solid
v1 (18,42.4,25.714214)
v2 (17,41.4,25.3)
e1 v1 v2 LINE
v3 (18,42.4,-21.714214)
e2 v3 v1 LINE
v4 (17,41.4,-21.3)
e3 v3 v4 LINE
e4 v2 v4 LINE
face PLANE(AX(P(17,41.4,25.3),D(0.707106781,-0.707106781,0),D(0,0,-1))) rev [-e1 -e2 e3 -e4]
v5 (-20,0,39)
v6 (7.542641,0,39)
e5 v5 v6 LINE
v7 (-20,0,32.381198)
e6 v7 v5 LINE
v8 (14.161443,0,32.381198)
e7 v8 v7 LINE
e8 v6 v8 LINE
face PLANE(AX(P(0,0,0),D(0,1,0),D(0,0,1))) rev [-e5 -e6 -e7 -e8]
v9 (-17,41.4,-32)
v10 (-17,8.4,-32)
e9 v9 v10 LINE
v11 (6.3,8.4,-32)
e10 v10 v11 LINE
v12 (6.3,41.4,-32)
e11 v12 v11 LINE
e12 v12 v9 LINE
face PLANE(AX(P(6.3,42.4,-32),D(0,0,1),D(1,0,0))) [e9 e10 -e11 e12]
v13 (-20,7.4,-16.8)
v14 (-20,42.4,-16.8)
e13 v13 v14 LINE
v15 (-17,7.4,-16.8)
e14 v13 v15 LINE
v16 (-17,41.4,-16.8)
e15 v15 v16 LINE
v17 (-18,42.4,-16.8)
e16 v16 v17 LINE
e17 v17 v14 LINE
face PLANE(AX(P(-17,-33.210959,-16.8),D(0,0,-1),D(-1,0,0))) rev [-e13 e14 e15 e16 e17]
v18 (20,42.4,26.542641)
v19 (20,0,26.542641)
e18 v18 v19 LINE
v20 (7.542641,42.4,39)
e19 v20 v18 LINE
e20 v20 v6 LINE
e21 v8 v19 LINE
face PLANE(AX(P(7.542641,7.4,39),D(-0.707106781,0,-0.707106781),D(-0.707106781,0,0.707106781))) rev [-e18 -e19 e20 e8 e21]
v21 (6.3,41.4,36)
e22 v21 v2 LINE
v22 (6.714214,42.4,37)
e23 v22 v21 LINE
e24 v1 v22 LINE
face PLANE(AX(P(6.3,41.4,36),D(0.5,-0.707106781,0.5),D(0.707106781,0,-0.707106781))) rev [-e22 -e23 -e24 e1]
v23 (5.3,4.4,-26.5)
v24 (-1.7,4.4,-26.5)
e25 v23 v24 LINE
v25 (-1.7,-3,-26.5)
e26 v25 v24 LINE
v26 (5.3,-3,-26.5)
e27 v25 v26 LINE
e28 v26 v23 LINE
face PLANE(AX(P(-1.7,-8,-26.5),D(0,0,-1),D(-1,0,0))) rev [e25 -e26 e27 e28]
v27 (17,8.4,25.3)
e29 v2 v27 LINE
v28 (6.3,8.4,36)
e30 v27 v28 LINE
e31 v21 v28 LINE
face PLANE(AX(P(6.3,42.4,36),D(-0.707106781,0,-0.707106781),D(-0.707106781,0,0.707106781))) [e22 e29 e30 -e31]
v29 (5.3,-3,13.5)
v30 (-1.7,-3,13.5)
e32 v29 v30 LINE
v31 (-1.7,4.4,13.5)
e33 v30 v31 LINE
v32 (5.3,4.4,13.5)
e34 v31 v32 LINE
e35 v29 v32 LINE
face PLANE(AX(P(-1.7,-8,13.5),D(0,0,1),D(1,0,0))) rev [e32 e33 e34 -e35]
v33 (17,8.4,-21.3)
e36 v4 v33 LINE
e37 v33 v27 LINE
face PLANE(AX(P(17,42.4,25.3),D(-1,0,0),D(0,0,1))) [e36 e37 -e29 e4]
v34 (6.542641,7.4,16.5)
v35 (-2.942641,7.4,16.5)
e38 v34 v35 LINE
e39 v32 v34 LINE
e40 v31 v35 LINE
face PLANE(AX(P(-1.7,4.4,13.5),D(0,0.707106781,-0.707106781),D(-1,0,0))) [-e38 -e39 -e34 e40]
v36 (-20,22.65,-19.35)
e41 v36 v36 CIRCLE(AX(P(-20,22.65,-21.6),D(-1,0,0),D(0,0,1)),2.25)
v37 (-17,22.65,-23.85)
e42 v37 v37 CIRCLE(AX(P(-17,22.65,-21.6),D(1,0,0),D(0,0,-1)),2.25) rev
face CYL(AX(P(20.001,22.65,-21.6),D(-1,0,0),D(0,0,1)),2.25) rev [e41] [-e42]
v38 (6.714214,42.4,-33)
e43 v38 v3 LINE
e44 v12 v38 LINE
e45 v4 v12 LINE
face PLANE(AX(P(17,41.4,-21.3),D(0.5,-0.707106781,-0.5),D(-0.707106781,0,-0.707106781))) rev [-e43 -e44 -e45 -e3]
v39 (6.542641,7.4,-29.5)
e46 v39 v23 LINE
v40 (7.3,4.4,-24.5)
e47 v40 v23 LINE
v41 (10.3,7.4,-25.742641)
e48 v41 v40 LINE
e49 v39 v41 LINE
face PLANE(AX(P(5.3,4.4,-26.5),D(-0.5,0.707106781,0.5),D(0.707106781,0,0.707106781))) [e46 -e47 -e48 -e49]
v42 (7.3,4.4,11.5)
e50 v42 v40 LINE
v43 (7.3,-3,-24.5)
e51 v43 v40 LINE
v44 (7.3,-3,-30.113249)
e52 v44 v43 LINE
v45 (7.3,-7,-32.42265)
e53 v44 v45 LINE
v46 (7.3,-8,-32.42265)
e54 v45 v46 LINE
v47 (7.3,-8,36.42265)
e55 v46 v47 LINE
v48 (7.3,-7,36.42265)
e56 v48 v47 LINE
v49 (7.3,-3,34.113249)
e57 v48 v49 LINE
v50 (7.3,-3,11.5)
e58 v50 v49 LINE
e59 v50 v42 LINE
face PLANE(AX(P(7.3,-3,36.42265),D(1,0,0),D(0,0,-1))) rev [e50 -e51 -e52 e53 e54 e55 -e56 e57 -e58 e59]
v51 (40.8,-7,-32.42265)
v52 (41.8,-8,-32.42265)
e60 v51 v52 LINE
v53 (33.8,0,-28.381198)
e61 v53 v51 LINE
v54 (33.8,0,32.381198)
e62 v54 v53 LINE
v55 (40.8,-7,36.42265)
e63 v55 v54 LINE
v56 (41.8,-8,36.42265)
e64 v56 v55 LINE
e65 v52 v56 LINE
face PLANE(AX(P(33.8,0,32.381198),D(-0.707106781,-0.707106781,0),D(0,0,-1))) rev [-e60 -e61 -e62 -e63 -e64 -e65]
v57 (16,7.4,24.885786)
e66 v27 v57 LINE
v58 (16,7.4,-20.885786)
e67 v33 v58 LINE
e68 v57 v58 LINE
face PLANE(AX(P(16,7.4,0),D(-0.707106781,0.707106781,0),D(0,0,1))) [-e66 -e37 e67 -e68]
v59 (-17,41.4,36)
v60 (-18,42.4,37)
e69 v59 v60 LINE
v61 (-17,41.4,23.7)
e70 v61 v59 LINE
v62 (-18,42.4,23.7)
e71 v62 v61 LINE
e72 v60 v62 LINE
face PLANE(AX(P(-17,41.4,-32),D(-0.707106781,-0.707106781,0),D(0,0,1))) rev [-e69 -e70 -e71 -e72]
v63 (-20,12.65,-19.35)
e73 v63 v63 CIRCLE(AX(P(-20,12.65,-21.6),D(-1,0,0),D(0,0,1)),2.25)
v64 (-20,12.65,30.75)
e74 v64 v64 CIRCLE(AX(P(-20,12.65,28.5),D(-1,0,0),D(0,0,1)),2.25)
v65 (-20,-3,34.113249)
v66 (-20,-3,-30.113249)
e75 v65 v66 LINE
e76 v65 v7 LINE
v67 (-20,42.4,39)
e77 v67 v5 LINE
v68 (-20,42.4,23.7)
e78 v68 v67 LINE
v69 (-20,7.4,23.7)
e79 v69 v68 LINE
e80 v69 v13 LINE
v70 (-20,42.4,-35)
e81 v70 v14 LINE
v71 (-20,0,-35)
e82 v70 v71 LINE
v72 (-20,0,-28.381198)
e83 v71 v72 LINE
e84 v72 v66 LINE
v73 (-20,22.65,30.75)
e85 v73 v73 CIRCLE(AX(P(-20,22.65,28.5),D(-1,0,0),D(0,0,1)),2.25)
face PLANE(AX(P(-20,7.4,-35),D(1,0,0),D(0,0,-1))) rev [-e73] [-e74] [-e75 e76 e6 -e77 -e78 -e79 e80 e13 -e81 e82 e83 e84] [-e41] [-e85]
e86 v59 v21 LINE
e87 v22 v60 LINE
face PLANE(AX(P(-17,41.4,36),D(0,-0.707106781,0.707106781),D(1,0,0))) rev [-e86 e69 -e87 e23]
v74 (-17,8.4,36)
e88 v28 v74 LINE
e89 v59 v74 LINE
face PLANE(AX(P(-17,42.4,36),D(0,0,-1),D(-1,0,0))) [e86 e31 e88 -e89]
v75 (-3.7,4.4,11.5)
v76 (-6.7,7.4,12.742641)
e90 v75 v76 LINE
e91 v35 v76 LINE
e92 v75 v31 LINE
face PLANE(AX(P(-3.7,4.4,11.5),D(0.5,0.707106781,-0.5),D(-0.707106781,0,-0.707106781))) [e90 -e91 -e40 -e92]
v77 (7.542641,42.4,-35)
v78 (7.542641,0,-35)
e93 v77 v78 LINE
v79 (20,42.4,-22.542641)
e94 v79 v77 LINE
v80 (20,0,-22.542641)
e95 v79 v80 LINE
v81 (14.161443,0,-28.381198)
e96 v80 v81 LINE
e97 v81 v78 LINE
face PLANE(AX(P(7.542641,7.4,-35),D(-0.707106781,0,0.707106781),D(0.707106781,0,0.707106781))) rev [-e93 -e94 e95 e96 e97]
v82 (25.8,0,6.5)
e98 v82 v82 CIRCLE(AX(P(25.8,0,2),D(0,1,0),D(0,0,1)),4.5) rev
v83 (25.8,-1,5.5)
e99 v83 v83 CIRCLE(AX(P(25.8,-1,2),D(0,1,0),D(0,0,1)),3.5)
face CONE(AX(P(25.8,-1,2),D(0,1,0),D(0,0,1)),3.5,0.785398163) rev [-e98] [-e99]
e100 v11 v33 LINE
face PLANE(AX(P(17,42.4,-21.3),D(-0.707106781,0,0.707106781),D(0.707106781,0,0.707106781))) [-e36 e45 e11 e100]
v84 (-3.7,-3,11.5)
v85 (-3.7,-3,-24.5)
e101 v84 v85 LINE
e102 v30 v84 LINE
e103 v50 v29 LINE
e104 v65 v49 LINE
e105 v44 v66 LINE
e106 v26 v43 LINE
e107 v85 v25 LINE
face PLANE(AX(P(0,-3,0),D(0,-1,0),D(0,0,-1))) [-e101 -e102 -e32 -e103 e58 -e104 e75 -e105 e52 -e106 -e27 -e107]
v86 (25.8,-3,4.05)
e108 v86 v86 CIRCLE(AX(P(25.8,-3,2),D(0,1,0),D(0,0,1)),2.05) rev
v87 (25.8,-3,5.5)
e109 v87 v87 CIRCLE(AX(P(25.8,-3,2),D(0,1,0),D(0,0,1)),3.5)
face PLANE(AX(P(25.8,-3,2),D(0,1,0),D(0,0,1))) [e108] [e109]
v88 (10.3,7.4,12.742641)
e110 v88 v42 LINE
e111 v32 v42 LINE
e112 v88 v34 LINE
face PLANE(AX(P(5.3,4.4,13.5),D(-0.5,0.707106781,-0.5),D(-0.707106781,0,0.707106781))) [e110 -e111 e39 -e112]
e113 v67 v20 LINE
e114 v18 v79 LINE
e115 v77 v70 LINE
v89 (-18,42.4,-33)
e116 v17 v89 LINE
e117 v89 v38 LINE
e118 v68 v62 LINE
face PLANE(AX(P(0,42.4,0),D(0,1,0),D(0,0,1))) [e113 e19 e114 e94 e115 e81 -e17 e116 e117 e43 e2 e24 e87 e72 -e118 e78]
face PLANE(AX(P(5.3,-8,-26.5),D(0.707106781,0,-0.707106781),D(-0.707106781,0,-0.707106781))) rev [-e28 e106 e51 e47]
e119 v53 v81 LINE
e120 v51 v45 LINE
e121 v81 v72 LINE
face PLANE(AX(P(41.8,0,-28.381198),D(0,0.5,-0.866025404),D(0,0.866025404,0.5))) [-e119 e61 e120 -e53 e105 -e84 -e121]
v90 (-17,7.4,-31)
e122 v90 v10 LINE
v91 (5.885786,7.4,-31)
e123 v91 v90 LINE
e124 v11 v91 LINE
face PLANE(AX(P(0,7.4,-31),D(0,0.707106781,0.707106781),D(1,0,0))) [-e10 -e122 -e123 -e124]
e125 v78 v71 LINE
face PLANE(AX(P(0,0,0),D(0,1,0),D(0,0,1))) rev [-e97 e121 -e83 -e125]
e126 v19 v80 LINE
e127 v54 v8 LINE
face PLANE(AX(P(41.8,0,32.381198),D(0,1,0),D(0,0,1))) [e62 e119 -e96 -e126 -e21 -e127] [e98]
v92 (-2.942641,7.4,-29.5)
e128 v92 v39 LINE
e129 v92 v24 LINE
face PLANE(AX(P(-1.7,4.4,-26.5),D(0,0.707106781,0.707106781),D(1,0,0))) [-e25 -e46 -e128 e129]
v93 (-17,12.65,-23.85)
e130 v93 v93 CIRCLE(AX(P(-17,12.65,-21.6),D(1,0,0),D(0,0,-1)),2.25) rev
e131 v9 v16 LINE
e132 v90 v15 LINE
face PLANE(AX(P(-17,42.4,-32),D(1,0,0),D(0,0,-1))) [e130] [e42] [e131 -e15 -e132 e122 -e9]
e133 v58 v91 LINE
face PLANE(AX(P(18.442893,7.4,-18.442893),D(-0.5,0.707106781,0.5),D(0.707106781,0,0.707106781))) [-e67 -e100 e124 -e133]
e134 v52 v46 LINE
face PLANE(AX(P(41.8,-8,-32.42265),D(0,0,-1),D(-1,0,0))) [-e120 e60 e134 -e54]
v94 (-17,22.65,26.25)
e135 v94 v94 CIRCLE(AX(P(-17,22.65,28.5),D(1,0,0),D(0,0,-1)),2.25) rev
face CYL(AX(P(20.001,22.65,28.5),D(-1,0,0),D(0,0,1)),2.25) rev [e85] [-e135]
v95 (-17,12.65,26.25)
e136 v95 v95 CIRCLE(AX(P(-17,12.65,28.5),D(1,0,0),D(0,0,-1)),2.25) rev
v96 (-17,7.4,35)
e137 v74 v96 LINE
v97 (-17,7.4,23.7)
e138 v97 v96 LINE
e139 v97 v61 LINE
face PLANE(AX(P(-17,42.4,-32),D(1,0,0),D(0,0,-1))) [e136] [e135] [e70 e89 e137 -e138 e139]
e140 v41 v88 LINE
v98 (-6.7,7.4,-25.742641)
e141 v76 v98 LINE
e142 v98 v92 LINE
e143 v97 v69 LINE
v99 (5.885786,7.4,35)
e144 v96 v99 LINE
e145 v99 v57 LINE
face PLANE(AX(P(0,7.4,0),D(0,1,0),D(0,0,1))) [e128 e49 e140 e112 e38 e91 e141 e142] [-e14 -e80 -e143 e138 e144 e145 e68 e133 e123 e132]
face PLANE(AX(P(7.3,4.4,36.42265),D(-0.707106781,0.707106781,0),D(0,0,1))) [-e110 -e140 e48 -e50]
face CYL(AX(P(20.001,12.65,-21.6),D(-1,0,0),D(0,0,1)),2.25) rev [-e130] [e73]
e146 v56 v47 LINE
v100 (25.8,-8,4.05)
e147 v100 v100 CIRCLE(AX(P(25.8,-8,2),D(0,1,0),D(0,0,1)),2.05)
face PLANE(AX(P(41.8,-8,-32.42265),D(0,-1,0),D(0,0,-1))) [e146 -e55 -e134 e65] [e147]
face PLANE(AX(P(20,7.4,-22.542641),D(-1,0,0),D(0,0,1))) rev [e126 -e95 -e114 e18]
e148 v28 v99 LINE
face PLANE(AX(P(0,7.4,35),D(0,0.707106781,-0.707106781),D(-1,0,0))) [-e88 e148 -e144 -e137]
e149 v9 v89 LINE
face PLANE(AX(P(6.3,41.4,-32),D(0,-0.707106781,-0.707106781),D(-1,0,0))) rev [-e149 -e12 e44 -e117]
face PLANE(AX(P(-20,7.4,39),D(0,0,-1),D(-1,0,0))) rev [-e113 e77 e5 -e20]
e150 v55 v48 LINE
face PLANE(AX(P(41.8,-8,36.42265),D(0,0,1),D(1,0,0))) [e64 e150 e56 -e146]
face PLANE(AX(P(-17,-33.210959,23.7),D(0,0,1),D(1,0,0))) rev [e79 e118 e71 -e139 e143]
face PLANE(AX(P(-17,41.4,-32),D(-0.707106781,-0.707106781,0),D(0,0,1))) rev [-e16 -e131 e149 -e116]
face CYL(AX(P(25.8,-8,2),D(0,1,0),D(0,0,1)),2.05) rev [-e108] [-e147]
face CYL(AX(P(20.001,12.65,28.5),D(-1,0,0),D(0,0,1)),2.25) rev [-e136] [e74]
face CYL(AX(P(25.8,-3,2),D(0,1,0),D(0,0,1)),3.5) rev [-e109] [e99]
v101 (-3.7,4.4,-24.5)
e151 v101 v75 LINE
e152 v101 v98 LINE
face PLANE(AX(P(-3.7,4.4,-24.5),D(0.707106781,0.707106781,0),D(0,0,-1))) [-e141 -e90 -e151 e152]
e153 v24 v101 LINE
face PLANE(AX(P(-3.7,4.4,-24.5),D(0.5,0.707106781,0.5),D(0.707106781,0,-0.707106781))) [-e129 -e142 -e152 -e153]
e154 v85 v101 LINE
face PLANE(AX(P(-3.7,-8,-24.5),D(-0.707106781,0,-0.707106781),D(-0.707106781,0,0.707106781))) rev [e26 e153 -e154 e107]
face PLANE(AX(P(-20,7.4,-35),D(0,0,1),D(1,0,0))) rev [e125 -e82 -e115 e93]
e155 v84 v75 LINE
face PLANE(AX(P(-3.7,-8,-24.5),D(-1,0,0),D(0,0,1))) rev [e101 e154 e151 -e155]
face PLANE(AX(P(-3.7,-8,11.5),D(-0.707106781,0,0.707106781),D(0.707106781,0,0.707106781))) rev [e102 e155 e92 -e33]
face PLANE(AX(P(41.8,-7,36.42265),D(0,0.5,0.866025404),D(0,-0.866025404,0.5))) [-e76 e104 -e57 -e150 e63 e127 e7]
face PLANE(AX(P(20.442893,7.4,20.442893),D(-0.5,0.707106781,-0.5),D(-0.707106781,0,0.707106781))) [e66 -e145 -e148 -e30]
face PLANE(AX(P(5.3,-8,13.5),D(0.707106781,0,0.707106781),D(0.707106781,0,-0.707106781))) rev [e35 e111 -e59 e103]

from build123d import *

# Parameters (mm, degrees)
MAIN_FACE_EXTRUDE_DEPTH              = 7.4
MAIN_WALLS_EXTRUDE_DEPTH             = 35
MAIN_WALLS_LOWER_CHAMFER_SIZE        = 1
MAIN_WALLS_ENTRY_CHAMFER_SIZE        = 1
SKETCH4_W                            = 3
SKETCH4_H                            = 40.5
SERVO_MOUNT_CUT_DEPTH                = 35
SERVO_MOUNT_HOLES_REACH              = 72.134
SKETCH5_R                            = 2.25
MOUNT_DOVETAIL_DEPTH                 = 61.8
MOUNT_DOVETAIL_CHAMFER_SIZE          = 8
SKETCH9_W                            = 27.3
SKETCH9_H                            = 68.845299462
DOVETAIL_OFFSET_CUT_DEPTH            = 5
SKETCH10_R                           = 2.05
MOUNT_SCREW_HOLE_DEPTH               = 72.175838597
SKETCH11_R                           = 3.5
MOUNT_SCREW_COUNTERSINK_DEPTH        = 3
MOUNT_SCREW_COUNTERSINK_CHAMFER_SIZE = 1
GEAR_CUT_DEPTH                       = 68.031634323
GEAR_ENTRY_CHAMFER_SIZE              = 3


with BuildPart() as part:
    # Sketch1 → Main Face Extrude (new body)
    with BuildSketch(Plane(origin=(0, 0, 0), x_dir=(1, 0, 0), z_dir=(0, 1, 0))):
        Polygon((-20, 35), (7.542640687, 35), (20, 22.542640687), (20, -26.542640687), (7.542640687, -39), (-20, -39), align=None)
    extrude(amount=MAIN_FACE_EXTRUDE_DEPTH)

    # Sketch3 → Main Walls Extrude (add)
    with BuildSketch(Plane(origin=(0, 7.4, 0), x_dir=(1, 0, 0), z_dir=(0, 1, 0))):
        Polygon((-20, 35), (-20, -39), (7.542640687, -39), (20, -26.542640687), (20, 22.542640687), (7.542640687, 35), align=None)
        Polygon((-17, 32), (-17, -36), (6.3, -36), (17, -25.3), (17, 21.3), (6.3, 32), align=None, mode=Mode.SUBTRACT)
    extrude(amount=MAIN_WALLS_EXTRUDE_DEPTH)

    # Main Walls Lower Chamfer
    main_walls_lower_chamfer_edges = [part.edges().sort_by_distance(p)[0] for p in [
        (-5.35, 7.4, -32),
        (-5.35, 7.4, 36),
        (11.65, 7.4, 30.65),
        (17, 7.4, 2),
        (11.65, 7.4, -26.65),
    ]]
    chamfer(main_walls_lower_chamfer_edges, length=MAIN_WALLS_LOWER_CHAMFER_SIZE)

    # Main Walls Entry Chamfer
    main_walls_entry_chamfer_edges = [part.edges().sort_by_distance(p)[0] for p in [
        (-5.35, 42.4, -32),
        (-17, 42.4, 2),
        (-5.35, 42.4, 36),
        (11.65, 42.4, 30.65),
        (17, 42.4, 2),
        (11.65, 42.4, -26.65),
    ]]
    chamfer(main_walls_entry_chamfer_edges, length=MAIN_WALLS_ENTRY_CHAMFER_SIZE)

    # Sketch4 → Servo Mount Cut (cut)
    with BuildSketch(Plane(origin=(0, 42.4, 0), x_dir=(1, 0, 0), z_dir=(0, 1, 0))):
        with Locations((-18.5, -3.45)):
            Rectangle(SKETCH4_W, SKETCH4_H)
    extrude(amount=-SERVO_MOUNT_CUT_DEPTH, mode=Mode.SUBTRACT)

    # Sketch5 → Servo Mount Holes (cut, up to next)
    with BuildSketch(Plane.ZY.offset(20), mode=Mode.PRIVATE) as servo_mount_holes_sk1:
        with Locations((-21.6, 22.65)):
            Circle(SKETCH5_R)
    servo_mount_holes_tool1 = extrude(servo_mount_holes_sk1.sketch, amount=-SERVO_MOUNT_HOLES_REACH, mode=Mode.PRIVATE) & part.part
    # Sketch5 → Servo Mount Holes (cut, up to next)
    with BuildSketch(Plane.ZY.offset(20), mode=Mode.PRIVATE) as servo_mount_holes_sk2:
        with Locations((-21.6, 12.65)):
            Circle(SKETCH5_R)
    servo_mount_holes_tool2 = extrude(servo_mount_holes_sk2.sketch, amount=-SERVO_MOUNT_HOLES_REACH, mode=Mode.PRIVATE) & part.part
    # Sketch5 → Servo Mount Holes (cut, up to next)
    with BuildSketch(Plane.ZY.offset(20), mode=Mode.PRIVATE) as servo_mount_holes_sk3:
        with Locations((28.5, 22.65)):
            Circle(SKETCH5_R)
    servo_mount_holes_tool3 = extrude(servo_mount_holes_sk3.sketch, amount=-SERVO_MOUNT_HOLES_REACH, mode=Mode.PRIVATE) & part.part
    # Sketch5 → Servo Mount Holes (cut, up to next)
    with BuildSketch(Plane.ZY.offset(20), mode=Mode.PRIVATE) as servo_mount_holes_sk4:
        with Locations((28.5, 12.65)):
            Circle(SKETCH5_R)
    servo_mount_holes_tool4 = extrude(servo_mount_holes_sk4.sketch, amount=-SERVO_MOUNT_HOLES_REACH, mode=Mode.PRIVATE) & part.part
    add(servo_mount_holes_tool1.solids().sort_by_distance((-20, 22.65, -21.6))[0], mode=Mode.SUBTRACT)
    add(servo_mount_holes_tool2.solids().sort_by_distance((-20, 12.65, -21.6))[0], mode=Mode.SUBTRACT)
    add(servo_mount_holes_tool3.solids().sort_by_distance((-20, 22.65, 28.5))[0], mode=Mode.SUBTRACT)
    add(servo_mount_holes_tool4.solids().sort_by_distance((-20, 12.65, 28.5))[0], mode=Mode.SUBTRACT)

    # Sketch8 → Mount Dovetail (add)
    with BuildSketch(Plane.ZY.offset(20)):
        Polygon((-28.381197846, 0), (-32.422649731, -7), (-32.422649731, -8), (36.422649731, -8), (36.422649731, -7), (32.381197846, 0), align=None)
    extrude(amount=-MOUNT_DOVETAIL_DEPTH)

    # Mount Dovetail Chamfer
    mount_dovetail_chamfer_edges = [part.edges().sort_by_distance(p)[0] for p in [
        (41.8, 0, 2),
    ]]
    chamfer(mount_dovetail_chamfer_edges, length=MOUNT_DOVETAIL_CHAMFER_SIZE - 0.0001)  # a hair under: the kernel refuses the full size

    # Sketch9 → Dovetail Offset Cut (cut)
    with BuildSketch(Plane.XZ.offset(8)):
        with Locations((-6.35, 2)):
            Rectangle(SKETCH9_W, SKETCH9_H)
    extrude(amount=-DOVETAIL_OFFSET_CUT_DEPTH, mode=Mode.SUBTRACT)

    # Sketch10 → Mount Screw Hole (cut, through all)
    with BuildSketch(Plane(origin=(0, 0, 0), x_dir=(1, 0, 0), z_dir=(0, 1, 0))):
        with Locations(Location((25.8, -2, 0), (0, 0, 270))):
            Circle(SKETCH10_R)
    extrude(amount=-MOUNT_SCREW_HOLE_DEPTH, mode=Mode.SUBTRACT)

    # Sketch11 → Mount Screw Countersink (cut)
    with BuildSketch(Plane(origin=(0, 0, 0), x_dir=(1, 0, 0), z_dir=(0, 1, 0))):
        with Locations(Location((25.8, -2, 0), (0, 0, 270))):
            Circle(SKETCH11_R)
    extrude(amount=-MOUNT_SCREW_COUNTERSINK_DEPTH, mode=Mode.SUBTRACT)

    # Mount Screw Countersink Chamfer
    mount_screw_countersink_chamfer_edges = [part.edges().sort_by_distance(p)[0] for p in [
        (25.8, 0, -1.5),
    ]]
    chamfer(mount_screw_countersink_chamfer_edges, length=MOUNT_SCREW_COUNTERSINK_CHAMFER_SIZE)

    # Sketch2 → Gear Cut (cut, through all)
    with BuildSketch(Plane(origin=(0, 7.4, 0), x_dir=(1, 0, 0), z_dir=(0, 1, 0))):
        Polygon((-1.7, 26.5), (5.3, 26.5), (7.3, 24.5), (7.3, -11.5), (5.3, -13.5), (-1.7, -13.5), (-3.7, -11.5), (-3.7, 24.5), align=None)
    extrude(amount=-GEAR_CUT_DEPTH, mode=Mode.SUBTRACT)

    # Gear Entry Chamfer
    gear_entry_chamfer_edges = [part.edges().sort_by_distance(p)[0] for p in [
        (-2.7, 7.4, -25.5),
        (-3.7, 7.4, -6.5),
        (-2.7, 7.4, 12.5),
        (1.8, 7.4, 13.5),
        (6.3, 7.4, 12.5),
        (7.3, 7.4, -6.5),
        (6.3, 7.4, -25.5),
        (1.8, 7.4, -26.5),
    ]]
    chamfer(gear_entry_chamfer_edges, length=GEAR_ENTRY_CHAMFER_SIZE)


solid = part.part
